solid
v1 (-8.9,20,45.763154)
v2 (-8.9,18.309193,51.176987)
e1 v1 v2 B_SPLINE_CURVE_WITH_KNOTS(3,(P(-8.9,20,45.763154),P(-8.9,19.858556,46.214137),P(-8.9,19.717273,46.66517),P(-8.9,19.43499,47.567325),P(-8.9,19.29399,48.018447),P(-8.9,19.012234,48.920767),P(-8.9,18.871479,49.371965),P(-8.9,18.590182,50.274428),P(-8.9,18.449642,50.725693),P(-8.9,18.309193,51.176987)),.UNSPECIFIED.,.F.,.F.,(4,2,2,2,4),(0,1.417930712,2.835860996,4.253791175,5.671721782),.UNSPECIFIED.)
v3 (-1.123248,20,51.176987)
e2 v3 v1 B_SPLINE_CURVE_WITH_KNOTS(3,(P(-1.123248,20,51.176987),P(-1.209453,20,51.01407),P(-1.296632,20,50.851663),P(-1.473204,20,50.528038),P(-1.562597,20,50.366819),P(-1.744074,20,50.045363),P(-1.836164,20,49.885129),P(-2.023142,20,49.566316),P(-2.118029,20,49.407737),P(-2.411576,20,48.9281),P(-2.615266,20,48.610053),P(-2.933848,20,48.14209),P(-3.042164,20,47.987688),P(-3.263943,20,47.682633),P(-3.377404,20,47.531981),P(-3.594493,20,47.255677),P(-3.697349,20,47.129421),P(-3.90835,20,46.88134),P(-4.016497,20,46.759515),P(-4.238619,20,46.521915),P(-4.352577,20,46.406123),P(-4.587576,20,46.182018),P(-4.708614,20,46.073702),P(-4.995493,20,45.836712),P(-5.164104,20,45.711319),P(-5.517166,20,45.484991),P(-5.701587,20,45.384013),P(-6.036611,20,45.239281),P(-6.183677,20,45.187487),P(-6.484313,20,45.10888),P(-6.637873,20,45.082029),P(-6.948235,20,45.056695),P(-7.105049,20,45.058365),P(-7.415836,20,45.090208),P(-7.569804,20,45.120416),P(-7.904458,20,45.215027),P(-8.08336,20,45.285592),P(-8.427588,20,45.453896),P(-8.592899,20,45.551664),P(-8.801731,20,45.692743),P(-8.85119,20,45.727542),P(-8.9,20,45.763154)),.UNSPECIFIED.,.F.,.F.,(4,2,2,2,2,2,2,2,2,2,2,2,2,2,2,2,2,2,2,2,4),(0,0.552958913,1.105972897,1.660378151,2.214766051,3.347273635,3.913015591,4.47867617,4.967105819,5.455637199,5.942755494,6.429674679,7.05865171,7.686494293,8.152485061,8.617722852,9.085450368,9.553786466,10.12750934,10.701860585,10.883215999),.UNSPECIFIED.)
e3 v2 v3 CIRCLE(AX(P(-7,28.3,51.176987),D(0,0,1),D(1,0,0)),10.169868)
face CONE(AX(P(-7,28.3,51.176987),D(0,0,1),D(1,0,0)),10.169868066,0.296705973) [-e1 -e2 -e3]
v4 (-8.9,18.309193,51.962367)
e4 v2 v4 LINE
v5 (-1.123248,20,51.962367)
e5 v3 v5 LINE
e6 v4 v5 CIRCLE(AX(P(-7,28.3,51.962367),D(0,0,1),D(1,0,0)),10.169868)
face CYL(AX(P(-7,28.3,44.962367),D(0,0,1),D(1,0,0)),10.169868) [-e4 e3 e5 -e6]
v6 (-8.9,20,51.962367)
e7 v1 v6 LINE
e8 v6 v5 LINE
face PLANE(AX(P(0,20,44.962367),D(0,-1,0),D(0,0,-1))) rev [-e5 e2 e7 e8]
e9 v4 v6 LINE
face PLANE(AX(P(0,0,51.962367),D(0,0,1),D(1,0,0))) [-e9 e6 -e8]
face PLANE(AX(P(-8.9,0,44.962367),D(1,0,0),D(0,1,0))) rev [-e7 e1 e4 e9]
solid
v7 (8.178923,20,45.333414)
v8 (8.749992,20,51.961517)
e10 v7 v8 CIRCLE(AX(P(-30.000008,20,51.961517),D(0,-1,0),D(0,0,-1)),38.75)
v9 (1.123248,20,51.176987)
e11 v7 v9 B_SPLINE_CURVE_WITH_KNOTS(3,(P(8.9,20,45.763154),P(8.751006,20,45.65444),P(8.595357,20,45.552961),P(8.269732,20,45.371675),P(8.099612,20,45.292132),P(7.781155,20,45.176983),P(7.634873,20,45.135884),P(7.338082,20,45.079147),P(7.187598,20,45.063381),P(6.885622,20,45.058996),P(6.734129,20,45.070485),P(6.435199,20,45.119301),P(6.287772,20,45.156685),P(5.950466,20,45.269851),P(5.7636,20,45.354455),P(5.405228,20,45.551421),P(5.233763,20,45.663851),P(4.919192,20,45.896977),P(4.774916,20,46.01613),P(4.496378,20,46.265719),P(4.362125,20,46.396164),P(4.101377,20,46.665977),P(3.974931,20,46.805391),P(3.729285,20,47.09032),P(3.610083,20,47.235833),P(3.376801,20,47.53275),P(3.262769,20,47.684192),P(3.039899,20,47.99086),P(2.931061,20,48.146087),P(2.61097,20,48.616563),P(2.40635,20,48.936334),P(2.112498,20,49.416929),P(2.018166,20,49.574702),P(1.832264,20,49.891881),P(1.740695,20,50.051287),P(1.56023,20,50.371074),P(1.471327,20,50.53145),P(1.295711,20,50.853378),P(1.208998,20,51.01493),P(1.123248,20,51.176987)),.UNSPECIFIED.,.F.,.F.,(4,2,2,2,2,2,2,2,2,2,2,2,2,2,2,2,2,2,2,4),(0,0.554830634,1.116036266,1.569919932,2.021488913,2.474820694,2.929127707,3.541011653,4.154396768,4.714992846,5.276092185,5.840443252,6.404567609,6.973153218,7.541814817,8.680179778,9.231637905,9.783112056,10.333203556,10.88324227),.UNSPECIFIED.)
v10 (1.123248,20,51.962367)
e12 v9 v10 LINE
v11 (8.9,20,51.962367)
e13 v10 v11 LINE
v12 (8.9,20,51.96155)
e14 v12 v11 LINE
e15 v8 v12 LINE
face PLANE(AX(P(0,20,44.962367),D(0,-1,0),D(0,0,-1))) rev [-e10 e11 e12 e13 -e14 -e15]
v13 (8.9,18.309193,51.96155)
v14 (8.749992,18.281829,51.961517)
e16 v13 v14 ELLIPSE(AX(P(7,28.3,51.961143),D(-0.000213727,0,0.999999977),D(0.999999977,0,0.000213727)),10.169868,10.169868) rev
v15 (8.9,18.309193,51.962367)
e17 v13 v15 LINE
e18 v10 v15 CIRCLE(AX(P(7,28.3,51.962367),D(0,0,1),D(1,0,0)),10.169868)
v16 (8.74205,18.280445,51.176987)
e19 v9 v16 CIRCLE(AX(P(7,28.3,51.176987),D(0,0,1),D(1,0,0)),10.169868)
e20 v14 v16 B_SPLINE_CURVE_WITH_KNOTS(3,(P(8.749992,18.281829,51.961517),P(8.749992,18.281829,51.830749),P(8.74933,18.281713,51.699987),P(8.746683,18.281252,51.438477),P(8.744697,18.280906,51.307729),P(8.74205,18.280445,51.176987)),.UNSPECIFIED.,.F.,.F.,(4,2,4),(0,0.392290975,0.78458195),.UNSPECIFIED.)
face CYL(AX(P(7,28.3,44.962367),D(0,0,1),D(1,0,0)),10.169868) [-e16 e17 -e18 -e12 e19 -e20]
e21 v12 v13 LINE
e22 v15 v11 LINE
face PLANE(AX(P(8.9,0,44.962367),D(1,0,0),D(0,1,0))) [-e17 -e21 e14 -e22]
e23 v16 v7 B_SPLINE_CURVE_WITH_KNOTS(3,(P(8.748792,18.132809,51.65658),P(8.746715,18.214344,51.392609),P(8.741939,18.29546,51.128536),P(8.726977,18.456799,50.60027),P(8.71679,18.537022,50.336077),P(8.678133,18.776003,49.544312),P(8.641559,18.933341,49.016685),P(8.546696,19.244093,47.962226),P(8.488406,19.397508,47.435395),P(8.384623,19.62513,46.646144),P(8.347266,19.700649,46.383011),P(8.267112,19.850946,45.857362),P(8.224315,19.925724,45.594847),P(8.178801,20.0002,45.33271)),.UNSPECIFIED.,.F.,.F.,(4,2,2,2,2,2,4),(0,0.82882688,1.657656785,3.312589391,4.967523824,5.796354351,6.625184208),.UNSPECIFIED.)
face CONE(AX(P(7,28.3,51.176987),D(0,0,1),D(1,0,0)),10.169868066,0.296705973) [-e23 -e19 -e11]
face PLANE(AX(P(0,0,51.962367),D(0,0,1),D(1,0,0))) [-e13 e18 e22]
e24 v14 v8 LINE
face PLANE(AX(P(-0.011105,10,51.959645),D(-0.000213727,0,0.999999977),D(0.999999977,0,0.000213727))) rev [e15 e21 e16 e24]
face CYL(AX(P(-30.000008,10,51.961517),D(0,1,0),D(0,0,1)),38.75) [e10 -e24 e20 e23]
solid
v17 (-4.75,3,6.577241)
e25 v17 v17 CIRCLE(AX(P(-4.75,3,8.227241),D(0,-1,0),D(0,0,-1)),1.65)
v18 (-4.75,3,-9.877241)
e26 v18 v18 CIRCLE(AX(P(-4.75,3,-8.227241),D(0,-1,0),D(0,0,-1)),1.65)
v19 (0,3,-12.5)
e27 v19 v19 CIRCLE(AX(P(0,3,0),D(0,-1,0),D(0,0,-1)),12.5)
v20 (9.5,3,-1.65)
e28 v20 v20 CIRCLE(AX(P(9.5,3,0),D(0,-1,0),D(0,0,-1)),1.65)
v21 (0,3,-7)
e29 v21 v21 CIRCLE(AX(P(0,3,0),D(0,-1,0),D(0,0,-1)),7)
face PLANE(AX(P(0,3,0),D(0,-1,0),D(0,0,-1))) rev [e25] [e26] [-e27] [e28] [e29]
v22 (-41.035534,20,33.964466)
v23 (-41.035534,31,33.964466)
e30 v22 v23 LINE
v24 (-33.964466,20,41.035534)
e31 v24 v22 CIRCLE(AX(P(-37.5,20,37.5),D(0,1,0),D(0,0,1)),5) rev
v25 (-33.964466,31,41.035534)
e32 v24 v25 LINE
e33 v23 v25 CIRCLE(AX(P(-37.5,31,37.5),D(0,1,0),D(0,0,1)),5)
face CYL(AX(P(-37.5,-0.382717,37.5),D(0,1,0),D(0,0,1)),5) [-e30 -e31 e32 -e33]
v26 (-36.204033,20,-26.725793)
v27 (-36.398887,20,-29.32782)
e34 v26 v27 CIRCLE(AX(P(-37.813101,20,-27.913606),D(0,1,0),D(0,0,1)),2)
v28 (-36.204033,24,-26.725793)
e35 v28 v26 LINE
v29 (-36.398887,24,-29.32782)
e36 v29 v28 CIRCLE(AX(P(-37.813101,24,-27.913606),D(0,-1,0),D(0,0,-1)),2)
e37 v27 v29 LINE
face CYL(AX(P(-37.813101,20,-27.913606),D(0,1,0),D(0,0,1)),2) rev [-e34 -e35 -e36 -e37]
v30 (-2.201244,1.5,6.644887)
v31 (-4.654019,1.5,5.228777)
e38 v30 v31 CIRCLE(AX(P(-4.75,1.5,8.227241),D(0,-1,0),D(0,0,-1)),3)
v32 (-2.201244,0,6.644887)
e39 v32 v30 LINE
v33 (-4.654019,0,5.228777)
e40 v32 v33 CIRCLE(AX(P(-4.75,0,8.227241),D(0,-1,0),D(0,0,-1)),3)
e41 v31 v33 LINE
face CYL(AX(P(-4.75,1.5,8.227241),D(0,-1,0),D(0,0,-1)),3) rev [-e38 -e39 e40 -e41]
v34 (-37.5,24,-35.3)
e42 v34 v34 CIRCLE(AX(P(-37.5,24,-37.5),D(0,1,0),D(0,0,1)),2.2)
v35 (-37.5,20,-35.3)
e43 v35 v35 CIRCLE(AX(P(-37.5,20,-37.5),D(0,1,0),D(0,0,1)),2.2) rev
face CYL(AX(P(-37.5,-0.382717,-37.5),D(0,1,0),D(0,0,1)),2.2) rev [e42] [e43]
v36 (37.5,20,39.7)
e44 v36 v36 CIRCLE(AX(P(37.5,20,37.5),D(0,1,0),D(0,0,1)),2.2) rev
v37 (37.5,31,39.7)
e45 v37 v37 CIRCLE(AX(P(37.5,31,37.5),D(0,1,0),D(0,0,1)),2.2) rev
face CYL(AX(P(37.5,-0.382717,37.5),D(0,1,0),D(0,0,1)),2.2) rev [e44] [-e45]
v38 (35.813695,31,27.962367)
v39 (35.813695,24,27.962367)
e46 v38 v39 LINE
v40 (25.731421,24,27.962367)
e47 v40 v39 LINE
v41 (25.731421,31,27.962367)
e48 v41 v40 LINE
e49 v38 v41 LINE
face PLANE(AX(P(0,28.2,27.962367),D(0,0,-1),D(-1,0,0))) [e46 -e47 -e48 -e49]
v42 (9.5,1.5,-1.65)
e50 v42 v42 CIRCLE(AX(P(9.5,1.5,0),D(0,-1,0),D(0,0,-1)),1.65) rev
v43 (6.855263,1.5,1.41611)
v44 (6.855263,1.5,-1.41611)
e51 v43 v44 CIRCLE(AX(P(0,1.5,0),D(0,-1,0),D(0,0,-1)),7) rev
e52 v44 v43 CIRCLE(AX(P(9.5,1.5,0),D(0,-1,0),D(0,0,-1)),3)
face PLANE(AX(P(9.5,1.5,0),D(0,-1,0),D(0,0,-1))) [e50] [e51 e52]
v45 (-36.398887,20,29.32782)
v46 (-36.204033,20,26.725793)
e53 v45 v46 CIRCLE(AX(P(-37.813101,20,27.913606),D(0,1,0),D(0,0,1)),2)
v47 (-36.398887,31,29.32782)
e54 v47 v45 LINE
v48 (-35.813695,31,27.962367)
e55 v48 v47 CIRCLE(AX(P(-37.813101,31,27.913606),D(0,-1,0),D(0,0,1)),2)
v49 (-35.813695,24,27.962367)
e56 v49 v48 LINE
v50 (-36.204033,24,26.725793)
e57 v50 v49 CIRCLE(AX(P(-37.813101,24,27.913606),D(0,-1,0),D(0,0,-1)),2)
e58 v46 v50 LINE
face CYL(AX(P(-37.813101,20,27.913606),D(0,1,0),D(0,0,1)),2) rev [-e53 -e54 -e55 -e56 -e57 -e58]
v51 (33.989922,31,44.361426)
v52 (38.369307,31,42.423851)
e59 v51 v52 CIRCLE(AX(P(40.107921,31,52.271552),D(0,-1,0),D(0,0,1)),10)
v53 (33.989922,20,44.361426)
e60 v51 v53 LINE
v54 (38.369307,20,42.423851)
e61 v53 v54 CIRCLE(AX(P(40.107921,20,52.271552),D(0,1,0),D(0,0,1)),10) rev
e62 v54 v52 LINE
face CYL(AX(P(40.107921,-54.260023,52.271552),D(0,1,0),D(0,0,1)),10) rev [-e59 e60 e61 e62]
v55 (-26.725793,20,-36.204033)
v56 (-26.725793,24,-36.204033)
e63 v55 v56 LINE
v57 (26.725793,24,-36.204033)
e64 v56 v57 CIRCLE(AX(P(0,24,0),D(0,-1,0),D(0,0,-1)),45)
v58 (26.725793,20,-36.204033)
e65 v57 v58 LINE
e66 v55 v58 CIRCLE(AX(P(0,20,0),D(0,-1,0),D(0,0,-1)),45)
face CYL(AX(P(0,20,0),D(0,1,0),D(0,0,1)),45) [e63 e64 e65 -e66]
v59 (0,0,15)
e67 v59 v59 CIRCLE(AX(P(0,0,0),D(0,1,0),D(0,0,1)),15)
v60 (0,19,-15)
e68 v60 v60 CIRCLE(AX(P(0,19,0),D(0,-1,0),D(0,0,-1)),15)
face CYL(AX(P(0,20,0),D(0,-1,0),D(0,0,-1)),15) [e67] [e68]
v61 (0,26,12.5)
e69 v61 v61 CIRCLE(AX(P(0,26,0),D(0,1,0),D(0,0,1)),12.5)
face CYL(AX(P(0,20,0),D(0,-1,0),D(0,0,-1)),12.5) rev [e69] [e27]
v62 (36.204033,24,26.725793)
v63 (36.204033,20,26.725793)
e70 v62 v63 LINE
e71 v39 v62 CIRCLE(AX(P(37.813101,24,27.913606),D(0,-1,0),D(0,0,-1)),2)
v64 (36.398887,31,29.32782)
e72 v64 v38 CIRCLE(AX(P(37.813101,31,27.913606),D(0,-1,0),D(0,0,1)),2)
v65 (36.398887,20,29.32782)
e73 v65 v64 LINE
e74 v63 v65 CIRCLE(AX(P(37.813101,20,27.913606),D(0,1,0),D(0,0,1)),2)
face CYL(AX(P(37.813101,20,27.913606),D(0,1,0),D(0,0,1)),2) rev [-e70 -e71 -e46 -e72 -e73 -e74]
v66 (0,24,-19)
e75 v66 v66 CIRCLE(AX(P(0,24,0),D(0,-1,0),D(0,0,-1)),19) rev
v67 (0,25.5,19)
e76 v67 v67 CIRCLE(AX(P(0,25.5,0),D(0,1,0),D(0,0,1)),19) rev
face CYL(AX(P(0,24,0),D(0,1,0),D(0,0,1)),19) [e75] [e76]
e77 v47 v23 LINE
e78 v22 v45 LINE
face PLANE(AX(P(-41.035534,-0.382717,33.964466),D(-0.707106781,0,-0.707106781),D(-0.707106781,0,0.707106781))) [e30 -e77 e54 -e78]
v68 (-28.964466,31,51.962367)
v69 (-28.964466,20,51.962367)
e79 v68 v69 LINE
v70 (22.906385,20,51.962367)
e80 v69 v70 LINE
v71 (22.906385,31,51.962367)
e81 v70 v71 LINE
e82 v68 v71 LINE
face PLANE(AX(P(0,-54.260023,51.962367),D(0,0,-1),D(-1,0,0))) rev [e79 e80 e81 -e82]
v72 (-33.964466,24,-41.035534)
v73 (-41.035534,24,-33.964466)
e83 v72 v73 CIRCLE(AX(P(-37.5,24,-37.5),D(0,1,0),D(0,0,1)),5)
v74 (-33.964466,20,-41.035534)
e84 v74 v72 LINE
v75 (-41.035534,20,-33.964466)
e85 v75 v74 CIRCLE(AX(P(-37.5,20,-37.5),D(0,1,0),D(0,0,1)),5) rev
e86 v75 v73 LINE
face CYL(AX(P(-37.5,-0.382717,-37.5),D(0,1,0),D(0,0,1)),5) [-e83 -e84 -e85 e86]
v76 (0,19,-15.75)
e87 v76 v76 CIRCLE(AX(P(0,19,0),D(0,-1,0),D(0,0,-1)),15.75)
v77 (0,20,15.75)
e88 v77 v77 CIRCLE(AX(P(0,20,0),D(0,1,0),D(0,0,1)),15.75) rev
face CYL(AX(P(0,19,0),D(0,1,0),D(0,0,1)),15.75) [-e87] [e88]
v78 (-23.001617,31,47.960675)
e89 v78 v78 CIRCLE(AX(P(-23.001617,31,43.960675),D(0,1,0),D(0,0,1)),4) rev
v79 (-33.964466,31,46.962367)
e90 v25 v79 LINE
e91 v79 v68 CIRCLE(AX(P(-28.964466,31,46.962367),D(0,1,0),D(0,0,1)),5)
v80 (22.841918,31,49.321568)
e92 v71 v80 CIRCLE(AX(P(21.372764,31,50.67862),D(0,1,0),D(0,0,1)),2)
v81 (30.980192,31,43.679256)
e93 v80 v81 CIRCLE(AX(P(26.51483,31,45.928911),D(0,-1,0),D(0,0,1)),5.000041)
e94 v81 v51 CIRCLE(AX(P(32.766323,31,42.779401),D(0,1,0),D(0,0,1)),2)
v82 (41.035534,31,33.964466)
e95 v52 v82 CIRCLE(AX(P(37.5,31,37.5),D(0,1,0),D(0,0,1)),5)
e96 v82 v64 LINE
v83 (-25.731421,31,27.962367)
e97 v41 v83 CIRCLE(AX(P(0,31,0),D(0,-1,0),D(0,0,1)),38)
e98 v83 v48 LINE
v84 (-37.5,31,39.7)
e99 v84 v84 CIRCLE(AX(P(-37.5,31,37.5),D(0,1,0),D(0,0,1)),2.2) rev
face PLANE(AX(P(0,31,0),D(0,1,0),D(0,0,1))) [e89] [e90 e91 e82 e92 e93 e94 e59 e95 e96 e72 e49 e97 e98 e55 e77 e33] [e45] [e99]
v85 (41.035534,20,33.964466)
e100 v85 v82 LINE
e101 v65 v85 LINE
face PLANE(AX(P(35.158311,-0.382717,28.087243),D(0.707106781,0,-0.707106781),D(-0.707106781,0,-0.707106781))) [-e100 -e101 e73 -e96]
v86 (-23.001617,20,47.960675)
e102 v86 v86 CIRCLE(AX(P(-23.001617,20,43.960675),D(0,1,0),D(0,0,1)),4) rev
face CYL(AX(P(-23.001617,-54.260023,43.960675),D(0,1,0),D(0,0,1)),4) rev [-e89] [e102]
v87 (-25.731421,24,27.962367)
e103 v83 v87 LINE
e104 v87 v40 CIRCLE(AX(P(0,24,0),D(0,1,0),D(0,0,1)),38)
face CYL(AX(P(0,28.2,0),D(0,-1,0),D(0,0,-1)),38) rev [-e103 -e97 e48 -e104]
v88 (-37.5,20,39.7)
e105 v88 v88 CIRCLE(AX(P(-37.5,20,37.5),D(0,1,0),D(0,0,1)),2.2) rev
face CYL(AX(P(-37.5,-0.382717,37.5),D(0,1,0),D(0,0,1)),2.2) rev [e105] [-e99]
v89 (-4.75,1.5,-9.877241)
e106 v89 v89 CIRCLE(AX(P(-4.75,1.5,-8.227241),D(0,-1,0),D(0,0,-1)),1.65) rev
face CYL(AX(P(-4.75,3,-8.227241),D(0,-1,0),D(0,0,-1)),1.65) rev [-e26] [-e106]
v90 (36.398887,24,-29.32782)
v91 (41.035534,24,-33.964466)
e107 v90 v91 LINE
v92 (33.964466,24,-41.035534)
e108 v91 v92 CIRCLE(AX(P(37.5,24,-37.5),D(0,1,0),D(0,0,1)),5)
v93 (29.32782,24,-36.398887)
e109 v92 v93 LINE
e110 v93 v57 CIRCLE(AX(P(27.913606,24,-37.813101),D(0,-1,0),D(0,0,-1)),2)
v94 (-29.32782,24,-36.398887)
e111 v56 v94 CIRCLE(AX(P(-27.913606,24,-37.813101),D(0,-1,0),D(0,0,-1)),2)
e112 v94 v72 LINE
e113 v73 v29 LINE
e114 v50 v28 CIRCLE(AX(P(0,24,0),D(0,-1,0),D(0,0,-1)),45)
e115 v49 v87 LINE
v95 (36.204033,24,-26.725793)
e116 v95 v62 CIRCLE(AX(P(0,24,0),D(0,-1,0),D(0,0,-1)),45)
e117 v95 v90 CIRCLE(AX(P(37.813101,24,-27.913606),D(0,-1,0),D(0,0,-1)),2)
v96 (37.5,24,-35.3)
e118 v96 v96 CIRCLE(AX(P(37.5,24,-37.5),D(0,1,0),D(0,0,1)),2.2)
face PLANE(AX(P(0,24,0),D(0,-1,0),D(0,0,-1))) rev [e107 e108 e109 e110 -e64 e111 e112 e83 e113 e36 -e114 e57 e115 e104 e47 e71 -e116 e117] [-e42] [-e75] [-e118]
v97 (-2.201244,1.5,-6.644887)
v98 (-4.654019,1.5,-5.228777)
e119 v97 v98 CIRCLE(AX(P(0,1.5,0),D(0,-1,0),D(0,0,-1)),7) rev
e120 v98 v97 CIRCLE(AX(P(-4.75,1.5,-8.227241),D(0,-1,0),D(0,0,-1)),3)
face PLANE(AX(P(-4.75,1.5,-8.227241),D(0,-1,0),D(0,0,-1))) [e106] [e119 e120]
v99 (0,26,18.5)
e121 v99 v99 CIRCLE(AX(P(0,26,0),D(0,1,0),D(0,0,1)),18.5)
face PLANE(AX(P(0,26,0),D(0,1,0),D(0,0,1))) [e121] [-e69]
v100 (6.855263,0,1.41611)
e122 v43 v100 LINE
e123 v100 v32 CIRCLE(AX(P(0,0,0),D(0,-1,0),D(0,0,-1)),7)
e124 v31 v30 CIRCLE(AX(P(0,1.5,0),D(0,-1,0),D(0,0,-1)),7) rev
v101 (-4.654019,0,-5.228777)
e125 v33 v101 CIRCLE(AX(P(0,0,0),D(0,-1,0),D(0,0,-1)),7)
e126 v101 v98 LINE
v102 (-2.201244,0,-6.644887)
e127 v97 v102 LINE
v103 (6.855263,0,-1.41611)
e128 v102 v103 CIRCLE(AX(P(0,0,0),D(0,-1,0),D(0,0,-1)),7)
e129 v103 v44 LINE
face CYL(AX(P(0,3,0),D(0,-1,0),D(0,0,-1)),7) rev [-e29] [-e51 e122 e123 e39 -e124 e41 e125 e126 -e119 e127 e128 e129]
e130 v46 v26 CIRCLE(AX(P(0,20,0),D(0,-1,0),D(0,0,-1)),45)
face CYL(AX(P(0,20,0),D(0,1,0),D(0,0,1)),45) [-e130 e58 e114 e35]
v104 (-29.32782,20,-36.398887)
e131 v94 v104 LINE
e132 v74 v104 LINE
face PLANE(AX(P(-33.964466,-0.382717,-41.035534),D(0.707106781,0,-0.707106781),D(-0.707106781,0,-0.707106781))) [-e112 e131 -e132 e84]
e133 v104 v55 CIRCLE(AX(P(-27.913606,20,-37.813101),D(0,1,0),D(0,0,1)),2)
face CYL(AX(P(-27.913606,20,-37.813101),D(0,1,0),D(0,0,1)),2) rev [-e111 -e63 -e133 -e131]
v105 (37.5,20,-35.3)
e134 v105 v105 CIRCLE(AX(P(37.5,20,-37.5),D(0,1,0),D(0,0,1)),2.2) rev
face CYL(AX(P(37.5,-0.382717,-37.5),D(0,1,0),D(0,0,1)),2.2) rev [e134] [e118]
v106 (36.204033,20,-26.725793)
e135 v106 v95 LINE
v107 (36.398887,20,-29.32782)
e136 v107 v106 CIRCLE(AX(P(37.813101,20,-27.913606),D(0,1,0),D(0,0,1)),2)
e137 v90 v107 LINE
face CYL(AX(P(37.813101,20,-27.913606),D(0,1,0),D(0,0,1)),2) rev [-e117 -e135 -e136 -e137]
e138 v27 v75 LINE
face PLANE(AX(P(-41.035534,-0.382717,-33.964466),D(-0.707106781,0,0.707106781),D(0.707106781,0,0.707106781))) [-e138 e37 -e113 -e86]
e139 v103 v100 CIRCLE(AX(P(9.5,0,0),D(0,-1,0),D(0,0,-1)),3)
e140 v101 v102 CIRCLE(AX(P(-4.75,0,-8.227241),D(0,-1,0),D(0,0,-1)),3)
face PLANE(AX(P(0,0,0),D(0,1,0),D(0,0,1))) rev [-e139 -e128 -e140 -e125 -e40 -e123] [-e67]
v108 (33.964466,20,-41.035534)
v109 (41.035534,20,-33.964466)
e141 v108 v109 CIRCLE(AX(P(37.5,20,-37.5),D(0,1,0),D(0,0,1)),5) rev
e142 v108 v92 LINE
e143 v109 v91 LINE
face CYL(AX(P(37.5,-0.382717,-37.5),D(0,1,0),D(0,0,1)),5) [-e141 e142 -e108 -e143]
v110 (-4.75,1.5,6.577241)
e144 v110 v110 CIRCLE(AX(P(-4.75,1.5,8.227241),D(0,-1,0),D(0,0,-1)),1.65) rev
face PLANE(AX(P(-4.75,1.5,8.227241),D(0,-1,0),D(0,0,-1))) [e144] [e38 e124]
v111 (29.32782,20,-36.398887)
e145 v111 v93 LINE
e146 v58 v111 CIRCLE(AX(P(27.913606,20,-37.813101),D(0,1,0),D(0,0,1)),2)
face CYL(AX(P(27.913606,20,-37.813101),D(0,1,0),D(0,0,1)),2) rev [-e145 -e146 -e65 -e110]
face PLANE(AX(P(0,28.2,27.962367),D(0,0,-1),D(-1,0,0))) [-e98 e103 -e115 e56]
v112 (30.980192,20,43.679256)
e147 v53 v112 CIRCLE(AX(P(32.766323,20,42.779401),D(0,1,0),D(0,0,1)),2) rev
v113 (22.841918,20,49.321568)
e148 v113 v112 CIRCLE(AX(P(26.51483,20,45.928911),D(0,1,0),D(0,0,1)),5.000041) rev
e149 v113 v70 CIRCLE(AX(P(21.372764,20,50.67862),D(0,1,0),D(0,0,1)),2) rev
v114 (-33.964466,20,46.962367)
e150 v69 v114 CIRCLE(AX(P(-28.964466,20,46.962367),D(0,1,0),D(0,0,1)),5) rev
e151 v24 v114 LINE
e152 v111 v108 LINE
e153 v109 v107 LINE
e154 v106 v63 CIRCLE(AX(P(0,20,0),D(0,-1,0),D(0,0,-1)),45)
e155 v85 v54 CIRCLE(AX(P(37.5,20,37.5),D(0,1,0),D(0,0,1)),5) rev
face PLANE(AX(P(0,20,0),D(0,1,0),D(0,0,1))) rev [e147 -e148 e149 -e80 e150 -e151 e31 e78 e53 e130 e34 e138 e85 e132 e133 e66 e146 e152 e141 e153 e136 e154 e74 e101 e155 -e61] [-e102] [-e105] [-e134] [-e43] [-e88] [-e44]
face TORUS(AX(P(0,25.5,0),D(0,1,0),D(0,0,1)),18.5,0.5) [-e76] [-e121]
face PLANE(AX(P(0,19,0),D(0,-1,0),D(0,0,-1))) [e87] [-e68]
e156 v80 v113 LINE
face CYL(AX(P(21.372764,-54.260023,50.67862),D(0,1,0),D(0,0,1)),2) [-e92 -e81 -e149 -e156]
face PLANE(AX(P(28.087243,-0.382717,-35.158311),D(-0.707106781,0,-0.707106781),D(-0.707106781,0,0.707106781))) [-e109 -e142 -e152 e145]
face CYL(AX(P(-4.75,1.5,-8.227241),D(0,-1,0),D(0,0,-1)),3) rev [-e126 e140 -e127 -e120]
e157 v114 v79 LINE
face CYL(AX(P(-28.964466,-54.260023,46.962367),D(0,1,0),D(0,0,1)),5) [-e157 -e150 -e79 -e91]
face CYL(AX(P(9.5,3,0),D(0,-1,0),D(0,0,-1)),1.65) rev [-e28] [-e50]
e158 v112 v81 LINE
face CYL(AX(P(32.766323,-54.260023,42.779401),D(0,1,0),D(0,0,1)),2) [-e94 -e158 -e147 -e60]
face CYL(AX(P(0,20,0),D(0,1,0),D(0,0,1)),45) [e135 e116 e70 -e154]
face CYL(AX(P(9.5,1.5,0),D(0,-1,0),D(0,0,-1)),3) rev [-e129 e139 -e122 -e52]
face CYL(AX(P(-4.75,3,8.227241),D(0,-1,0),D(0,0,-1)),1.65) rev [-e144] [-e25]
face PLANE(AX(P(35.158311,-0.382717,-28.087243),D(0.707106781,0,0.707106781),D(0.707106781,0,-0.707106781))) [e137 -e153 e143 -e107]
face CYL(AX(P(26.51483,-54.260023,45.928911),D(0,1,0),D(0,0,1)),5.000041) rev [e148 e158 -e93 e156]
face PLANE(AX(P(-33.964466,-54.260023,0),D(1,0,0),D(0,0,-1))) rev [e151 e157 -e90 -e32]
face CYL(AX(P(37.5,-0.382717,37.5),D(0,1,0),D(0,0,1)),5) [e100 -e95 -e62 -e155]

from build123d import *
from build123d.topology import SkipClean

# Parameters (mm, degrees)
SKETCH_1_R          = 15
SKETCH_1_R_2        = 12.5
EXTRUDE_1_DEPTH     = 20
SKETCH_2_R          = 17
SKETCH_2_R_2        = 12.5
EXTRUDE_2_DEPTH     = 6
SKETCH_3_R          = 12.5
SKETCH_3_R_2        = 7
SKETCH_3_R_3        = 1.65
EXTRUDE_3_DEPTH     = 3
EXTRUDE_START       = -2
SKETCH_5_R          = 19
SKETCH_5_R_2        = 17
EXTRUDE_5_DEPTH     = 2
SKETCH_6_W          = 26
SKETCH_6_H          = 26
SKETCH_6_R          = 12.5
EXTRUDE_6_DEPTH     = 2
EXTRUDE_START_2     = 4
SKETCH_7_R          = 45
SKETCH_7_R_2        = 17
EXTRUDE_7_DEPTH     = 4
EXTRUDE_START_3     = -4
SKETCH_8_R          = 2.2
EXTRUDE_8_DEPTH     = 4
SKETCH_9_R          = 4
EXTRUDE_9_DEPTH     = 4
FILLET_1_R          = 2
SKETCH_10_R         = 19
CUT_EXTRUDE_1_DEPTH = 74.492092218
FILLET_2_R          = 0.5
FILLET_3_R          = 5
SKETCH_11_R         = 3
CUT_EXTRUDE_2_DEPTH = 1.5
EXTRUDE_START_4     = 1
SKETCH_12_R         = 15.75
SKETCH_12_R_2       = 15
EXTRUDE_10_DEPTH    = 1
SKETCH_13_R         = 4
SKETCH_13_R_2       = 2.2
EXTRUDE_11_DEPTH    = 4.2
EXTRUDE_12_DEPTH    = 7
EXTRUDE_12_2_DEPTH  = 7
CHAMFER_1_SIZE      = 6.214619975
CHAMFER_1_SIZE_2    = 1.9
CHAMFER_2_SIZE      = 6.214619975
CHAMFER_2_SIZE_2    = 1.9
CUT_EXTRUDE_4_DEPTH = 10
FILLET_4_R          = 2
SKETCH_16_R         = 2.2
SKETCH_16_R_2       = 4
EXTRUDE_13_DEPTH    = 3
CUT_EXTRUDE_START   = -0.2
CUT_EXTRUDE_5_DEPTH = 0.2


with BuildPart() as part:
    # 草图1 → 凸台-拉伸1 (new body)
    with BuildSketch(Plane(origin=(0, 0, 0), x_dir=(1, 0, 0), z_dir=(0, 1, 0))):
        with Locations(Location((0, 0, 0), (0, 0, 270))):
            Circle(SKETCH_1_R)
        with Locations(Location((0, 0, 0), (0, 0, 270))):
            Circle(SKETCH_1_R_2, mode=Mode.SUBTRACT)
    extrude(amount=EXTRUDE_1_DEPTH)

    # 草图2 → 凸台-拉伸2 (add)
    with BuildSketch(Plane(origin=(0, 20, 0), x_dir=(1, 0, 0), z_dir=(0, 1, 0))):
        with Locations(Location((0, 0, 0), (0, 0, 270))):
            Circle(SKETCH_2_R)
        with Locations(Location((0, 0, 0), (0, 0, 270))):
            Circle(SKETCH_2_R_2, mode=Mode.SUBTRACT)
    extrude(amount=EXTRUDE_2_DEPTH)

    # 草图3 → 凸台-拉伸3 (add)
    with BuildSketch(Plane.XZ):
        with Locations(Location((0, 0, 0), (0, 0, 270))):
            Circle(SKETCH_3_R)
        with Locations(Location((0, 0, 0), (0, 0, 270))):
            Circle(SKETCH_3_R_2, mode=Mode.SUBTRACT)
        with Locations(Location((9.5, 0, 0), (0, 0, 270))):
            Circle(SKETCH_3_R_3, mode=Mode.SUBTRACT)
        with Locations(Location((-4.75, -8.227241336, 0), (0, 0, 270))):
            Circle(SKETCH_3_R_3, mode=Mode.SUBTRACT)
        with Locations(Location((-4.75, 8.227241336, 0), (0, 0, 270))):
            Circle(SKETCH_3_R_3, mode=Mode.SUBTRACT)
    extrude(amount=-EXTRUDE_3_DEPTH)

    # 草图5 → 凸台-拉伸5 (add)
    with BuildSketch(Plane(origin=(0, 26, 0), x_dir=(1, 0, 0), z_dir=(0, 1, 0)).offset(EXTRUDE_START)):
        with Locations(Location((0, 0, 0), (0, 0, 270))):
            Circle(SKETCH_5_R)
        with Locations(Location((0, 0, 0), (0, 0, 270))):
            Circle(SKETCH_5_R_2, mode=Mode.SUBTRACT)
    extrude(amount=EXTRUDE_5_DEPTH)

    # 草图6 → 凸台-拉伸6 (add)
    with BuildSketch(Plane(origin=(0, 26, 0), x_dir=(1, 0, 0), z_dir=(0, 1, 0))):
        Rectangle(SKETCH_6_W, SKETCH_6_H)
        with Locations(Location((0, 0, 0), (0, 0, 90))):
            Circle(SKETCH_6_R, mode=Mode.SUBTRACT)
    extrude(amount=EXTRUDE_6_DEPTH)

    # 草图7 → 凸台-拉伸7 (add)
    with BuildSketch(Plane.XZ.offset(-24).offset(EXTRUDE_START_2)):
        with Locations(Location((0, 0, 0), (0, 0, 270))):
            Circle(SKETCH_7_R)
        Circle(SKETCH_7_R_2, mode=Mode.SUBTRACT)
    extrude(amount=-EXTRUDE_7_DEPTH)

    # 草图8 → 凸台-拉伸8 (add)
    # profile 1 of 4: a face of its own
    with BuildSketch(Plane(origin=(0, 24, 0), x_dir=(1, 0, 0), z_dir=(0, 1, 0)).offset(EXTRUDE_START_3)):
        with BuildLine():
            Line((-41.035533906, -33.964466094), (-35.158310508, -28.087242696))
            ThreePointArc((-35.158310508, -28.087242696), (-31.819805153, -31.819805153), (-28.087242696, -35.158310508))
            Line((-28.087242696, -35.158310508), (-33.964466094, -41.035533906))
            ThreePointArc((-33.964466094, -41.035533906), (-41.035533906, -41.035533906), (-41.035533906, -33.964466094))
        make_face()
        with Locations(Location((-37.5, -37.5, 0), (0, 0, 270))):
            Circle(SKETCH_8_R, mode=Mode.SUBTRACT)
    # profile 2 of 4: a face of its own
    with BuildSketch(Plane(origin=(0, 24, 0), x_dir=(1, 0, 0), z_dir=(0, 1, 0)).offset(EXTRUDE_START_3)):
        with BuildLine():
            Line((-41.035533906, 33.964466094), (-35.158310508, 28.087242696))
            ThreePointArc((-35.158310508, 28.087242696), (-31.819805153, 31.819805153), (-28.087242696, 35.158310508))
            Line((-28.087242696, 35.158310508), (-33.964466094, 41.035533906))
            ThreePointArc((-33.964466094, 41.035533906), (-41.035533906, 41.035533906), (-41.035533906, 33.964466094))
        make_face()
        with Locations(Location((-37.5, 37.5, 0), (0, 0, 270))):
            Circle(SKETCH_8_R, mode=Mode.SUBTRACT)
    # profile 3 of 4: a face of its own
    with BuildSketch(Plane(origin=(0, 24, 0), x_dir=(1, 0, 0), z_dir=(0, 1, 0)).offset(EXTRUDE_START_3)):
        with BuildLine():
            Line((28.087242696, 35.158310508), (33.964466094, 41.035533906))
            ThreePointArc((33.964466094, 41.035533906), (41.035533906, 41.035533906), (41.035533906, 33.964466094))
            Line((41.035533906, 33.964466094), (35.158310508, 28.087242696))
            ThreePointArc((35.158310508, 28.087242696), (31.819805153, 31.819805153), (28.087242696, 35.158310508))
        make_face()
        with Locations(Location((37.5, 37.5, 0), (0, 0, 270))):
            Circle(SKETCH_8_R, mode=Mode.SUBTRACT)
    # profile 4 of 4: a face of its own
    with BuildSketch(Plane(origin=(0, 24, 0), x_dir=(1, 0, 0), z_dir=(0, 1, 0)).offset(EXTRUDE_START_3)):
        with BuildLine():
            Line((35.158310508, -28.087242696), (41.035533906, -33.964466094))
            ThreePointArc((41.035533906, -33.964466094), (41.035533906, -41.035533906), (33.964466094, -41.035533906))
            Line((33.964466094, -41.035533906), (28.087242696, -35.158310508))
            ThreePointArc((28.087242696, -35.158310508), (31.819805153, -31.819805153), (35.158310508, -28.087242696))
        make_face()
        with Locations(Location((37.5, -37.5, 0), (0, 0, 270))):
            Circle(SKETCH_8_R, mode=Mode.SUBTRACT)
    extrude(amount=EXTRUDE_8_DEPTH)

    # 草图9 → 凸台-拉伸9 (add)
    with BuildSketch(Plane(origin=(0, 24, 0), x_dir=(1, 0, 0), z_dir=(0, 1, 0)).offset(EXTRUDE_START_3)):
        with BuildLine():
            Line((33.964466094, -41.035533906), (28.087242696, -35.158310508))
            ThreePointArc((28.087242696, -35.158310508), (0, -45), (-28.087242696, -35.158310508))
            Line((-28.087242696, -35.158310508), (-33.964466094, -41.035533906))
            Line((-33.964466094, -41.035533906), (-33.964466094, -51.96236733))
            Line((-33.964466094, -51.96236733), (22.906384924, -51.96236733))
            Line((22.906384924, -51.96236733), (27.649740331, -50.798447588))
            ThreePointArc((27.649740331, -50.798447588), (23.364635585, -42.046040599), (31.045885235, -48.043136112))
            ThreePointArc((31.045885235, -48.043136112), (34.020425636, -44.337927578), (38.36930714, -42.423850637))
            ThreePointArc((38.36930714, -42.423850637), (35.996987316, -42.268747516), (33.964466094, -41.035533906))
        make_face()
        with Locations(Location((-23.001616716, -43.96067534, 0), (0, 0, 270))):
            Circle(SKETCH_9_R, mode=Mode.SUBTRACT)
    extrude(amount=EXTRUDE_9_DEPTH)

    # 圆角1
    # the kernel refuses this fillet: 2 mm, written as the material it takes off along each edge
    with BuildSketch(Plane(origin=(31.045885235, 8.214854918, 48.043136112), x_dir=(-0.015052067443698006, 0, -0.9998867112156609), z_dir=(0, 1, 0))) as fillet_1_piece_1:
        with BuildLine():
            CenterArc((5.237242596, -1.799472632), FILLET_1_R, 115.876571243, 100.980737452)
            Line((3.636978972, -2.999121053), (3.6049737, -3.023114021))
            ThreePointArc((3.6049737, -3.023114021), (1.972291731, -1.313047371), (-0.017457357, -0.035989453))
            Line((-0.017457357, -0.035989453), (0.017457357, 0.035989453))
            ThreePointArc((0.017457357, 0.035989453), (2.182187383, -0.461322512), (4.34691741, 0.035989453))
            Line((4.34691741, 0.035989453), (4.364374767, 0))
        make_face()
    extrude(amount=27.570290164, mode=Mode.SUBTRACT)
    with BuildSketch(Plane(origin=(27.649740331, 7.426134815, 50.798447588), x_dir=(-0.9711892764491741, 0, 0.23830944024551268), z_dir=(0, 1, 0))) as fillet_1_piece_2:
        with BuildLine():
            CenterArc((6.067575487, -1.612238295), FILLET_1_R, 126.281523765, 82.66024712)
            Line((4.317351562, -2.580079301), (4.282347084, -2.599436121))
            ThreePointArc((4.282347084, -2.599436121), (2.486180213, -0.742013172), (-0.000465948, -0.039997286))
            Line((-0.000465948, -0.039997286), (0, 0.04))
            ThreePointArc((0, 0.04), (2.442034484, 0.04), (4.860398838, 0.032244766))
            Line((4.860398838, 0.032244766), (4.884068968, 0))
        make_face()
    extrude(amount=29.147730371, mode=Mode.SUBTRACT)

    # 草图10 → 切除-拉伸1 (cut, through all)
    with BuildSketch(Plane(origin=(0, 26, 0), x_dir=(1, 0, 0), z_dir=(0, 1, 0))):
        with Locations(Location((0, 0, 0), (0, 0, 270))):
            Circle(SKETCH_10_R)
    extrude(amount=CUT_EXTRUDE_1_DEPTH, mode=Mode.SUBTRACT)

    # 圆角2
    fillet_2_edges = [part.edges().sort_by_distance(p)[0] for p in [
        (0, 26, -19),
    ]]
    fillet(fillet_2_edges, radius=FILLET_2_R)

    # 圆角3
    fillet_3_edges = [part.edges().sort_by_distance(p)[0] for p in [
        (-33.964466094, 22, 51.96236733),
    ]]
    fillet(fillet_3_edges, radius=FILLET_3_R)

    # 草图11 → 切除-拉伸2 (cut)
    with BuildSketch(Plane.XZ):
        with Locations((-4.75, 8.227241336)):
            Circle(SKETCH_11_R)
        with Locations((9.5, 0)):
            Circle(SKETCH_11_R)
        with Locations((-4.75, -8.227241336)):
            Circle(SKETCH_11_R)
    extrude(amount=-CUT_EXTRUDE_2_DEPTH, mode=Mode.SUBTRACT)

    # 草图12 → 凸台-拉伸10 (add)
    with BuildSketch(Plane.XZ.offset(-20).offset(EXTRUDE_START_4)):
        with Locations(Location((0, 0, 0), (0, 0, 90))):
            Circle(SKETCH_12_R)
        with Locations(Location((0, 0, 0), (0, 0, 270))):
            Circle(SKETCH_12_R_2, mode=Mode.SUBTRACT)
    extrude(amount=-EXTRUDE_10_DEPTH)

    # 草图13 → 凸台-拉伸11 (add)
    # profile 1 of 2: a face of its own
    with BuildSketch(Plane(origin=(0, 24, 0), x_dir=(1, 0, 0), z_dir=(0, 1, 0))):
        with BuildLine():
            Line((-25.73142074, -27.96236733), (-35.257708566, -27.96236733))
            ThreePointArc((-35.257708566, -27.96236733), (-35.2080649, -28.024849081), (-35.158310508, -28.087242696))
            ThreePointArc((-35.158310508, -28.087242696), (0, -45), (35.158310508, -28.087242696))
            ThreePointArc((35.158310508, -28.087242696), (35.2080649, -28.024849081), (35.257708566, -27.96236733))
            Line((35.257708566, -27.96236733), (25.73142074, -27.96236733))
            ThreePointArc((25.73142074, -27.96236733), (0, -38), (-25.73142074, -27.96236733))
        make_face()
    # profile 2 of 2: a face of its own
    with BuildSketch(Plane(origin=(0, 24, 0), x_dir=(1, 0, 0), z_dir=(0, 1, 0))):
        with BuildLine():
            ThreePointArc((35.158310508, -28.087242696), (0, -45), (-35.158310508, -28.087242696))
            Line((-35.158310508, -28.087242696), (-41.035533906, -33.964466094))
            ThreePointArc((-41.035533906, -33.964466094), (-41.035533906, -41.035533906), (-33.964466094, -41.035533906))
            Line((-33.964466094, -41.035533906), (-33.964466094, -46.96236733))
            ThreePointArc((-33.964466094, -46.96236733), (-32.5, -50.497901236), (-28.964466094, -51.96236733))
            Line((-28.964466094, -51.96236733), (22.906384924, -51.96236733))
            ThreePointArc((22.906384924, -51.96236733), (23.372168796, -50.629809961), (22.841917537, -49.321567873))
            ThreePointArc((22.841917537, -49.321567873), (23.665985567, -41.819836541), (30.980192372, -43.67925578))
            ThreePointArc((30.980192372, -43.67925578), (32.324226236, -44.729926812), (33.989922469, -44.361426197))
            ThreePointArc((33.989922469, -44.361426197), (36.06191813, -43.126615751), (38.36930714, -42.423850637))
            ThreePointArc((38.36930714, -42.423850637), (42.268747516, -39.003012684), (41.035533906, -33.964466094))
            Line((41.035533906, -33.964466094), (35.158310508, -28.087242696))
        make_face()
        with Locations(Location((-23.001616716, -43.96067534, 0), (0, 0, 270))):
            Circle(SKETCH_13_R, mode=Mode.SUBTRACT)
        with Locations(Location((-37.5, -37.5, 0), (0, 0, 270))):
            Circle(SKETCH_13_R_2, mode=Mode.SUBTRACT)
        with Locations(Location((37.5, -37.5, 0), (0, 0, 270))):
            Circle(SKETCH_13_R_2, mode=Mode.SUBTRACT)
    extrude(amount=EXTRUDE_11_DEPTH)

    # 圆角4
    # the kernel refuses this fillet: 2 mm, written as the material it adds along each edge
    with BuildSketch(Plane(origin=(-35.158310508, 24, 28.087242696), x_dir=(-0.6091445543009105, 0, -0.793059210882482), z_dir=(0, 1, 0))) as fillet_4_piece_1_section:
        with BuildLine():
            CenterArc((1.754855317, 1.99963613), FILLET_4_R, 187.472325658, 81.434718893)
            Line((-0.228160265, 1.739541528), (0, 0))
            ThreePointArc((0, 0), (0.858353144, 0.008187079), (1.716706288, 0))
        make_face()
    fillet_4_piece_1 = extrude(amount=4.2, mode=Mode.PRIVATE)
    fillet_4_piece_1 = split(fillet_4_piece_1, bisect_by=Plane(origin=(-35.158310508, 24, 27.96236733), z_dir=(0, 0, 1)), keep=Keep.TOP, mode=Mode.PRIVATE)
    add(fillet_4_piece_1)
    with BuildSketch(Plane(origin=(28.087242696, 20, -35.158310508), x_dir=(0.7071067811865485, 0, -0.7071067811865465), z_dir=(0, 1, 0)), Plane(origin=(-35.158310508, 20, -28.087242696), x_dir=(-0.7071067811865496, 0, -0.7071067811865455), z_dir=(0, 1, 0))) as fillet_4_piece_2:
        with BuildLine():
            CenterArc((1.754440604, 2), FILLET_4_R, 188.565281108, 81.434718892)
            ThreePointArc((-0.223253019, 1.70212766), (-0.103508957, 0.852128537), (0, 0))
            Line((0, 0), (1.754440604, 0))
        make_face()
    extrude(amount=4)
    with BuildSketch(Plane(origin=(35.158310508, 20, -28.087242696), x_dir=(0.6091445542993271, 0, 0.7930592108836982), z_dir=(0, 1, 0)), Plane(origin=(-28.087242696, 20, -35.158310508), x_dir=(0.7930592108837022, 0, -0.6091445542993219), z_dir=(0, 1, 0)), Plane(origin=(-35.158310508, 20, 28.087242696), x_dir=(-0.6091445542993226, 0, -0.7930592108837018), z_dir=(0, 1, 0))) as fillet_4_piece_3:
        with BuildLine():
            CenterArc((1.754855317, 1.99963613), FILLET_4_R, 187.472325658, 81.434718892)
            Line((-0.228160265, 1.739541528), (0, 0))
            ThreePointArc((0, 0), (0.858353144, 0.008187079), (1.716706288, 0))
        make_face()
    extrude(amount=4)
    with BuildSketch(Plane(origin=(35.158310508, 24, 28.087242696), x_dir=(0.6091445574940213, 0, -0.7930592084298707), z_dir=(0, 1, 0))) as fillet_4_piece_4_section:
        with BuildLine():
            CenterArc((1.754855324, -1.99963613), FILLET_4_R, 91.092955673, 81.4347189)
            Line((-0.228160259, -1.739541536), (0, 0))
            ThreePointArc((0, 0), (0.858353144, -0.008187083), (1.716706288, 0))
        make_face()
    fillet_4_piece_4 = extrude(amount=4.2, mode=Mode.PRIVATE)
    fillet_4_piece_4 = split(fillet_4_piece_4, bisect_by=Plane(origin=(35.158310508, 24, 27.96236733), z_dir=(0, 0, 1)), keep=Keep.TOP, mode=Mode.PRIVATE)
    add(fillet_4_piece_4)
    with BuildSketch(Plane(origin=(35.158310508, 20, 28.087242696), x_dir=(0.609144554299323, 0, -0.7930592108837013), z_dir=(0, 1, 0))) as fillet_4_piece_5:
        with BuildLine():
            CenterArc((1.754855317, -1.99963613), FILLET_4_R, 91.09295545, 81.434718892)
            Line((-0.228160265, -1.739541528), (0, 0))
            ThreePointArc((0, 0), (0.858353144, -0.008187079), (1.716706288, 0))
        make_face()
    extrude(amount=4)

    # 草图16 → 凸台-拉伸13 (add)
    with BuildSketch(Plane(origin=(0, 28.2, 0), x_dir=(1, 0, 0), z_dir=(0, 1, 0))):
        with BuildLine():
            Line((-25.73142074, -27.96236733), (-35.813695424, -27.96236733))
            ThreePointArc((-35.813695424, -27.96236733), (-35.974809945, -28.701442447), (-36.398887356, -29.327819544))
            Line((-36.398887356, -29.327819544), (-41.035533906, -33.964466094))
            ThreePointArc((-41.035533906, -33.964466094), (-41.035533906, -41.035533906), (-33.964466094, -41.035533906))
            Line((-33.964466094, -41.035533906), (-33.964466094, -46.96236733))
            ThreePointArc((-33.964466094, -46.96236733), (-32.5, -50.497901236), (-28.964466094, -51.96236733))
            Line((-28.964466094, -51.96236733), (22.906384924, -51.96236733))
            ThreePointArc((22.906384924, -51.96236733), (23.372168796, -50.629809961), (22.841917537, -49.321567873))
            ThreePointArc((22.841917537, -49.321567873), (23.665985567, -41.819836541), (30.980192372, -43.67925578))
            ThreePointArc((30.980192372, -43.67925578), (32.324226236, -44.729926812), (33.989922469, -44.361426197))
            ThreePointArc((33.989922469, -44.361426197), (36.06191813, -43.126615751), (38.36930714, -42.423850637))
            ThreePointArc((38.36930714, -42.423850637), (42.268747516, -39.003012684), (41.035533906, -33.964466094))
            Line((41.035533906, -33.964466094), (36.398887356, -29.327819544))
            ThreePointArc((36.398887356, -29.327819544), (35.974809945, -28.701442447), (35.813695424, -27.96236733))
            Line((35.813695424, -27.96236733), (25.73142074, -27.96236733))
            ThreePointArc((25.73142074, -27.96236733), (0, -38), (-25.73142074, -27.96236733))
        make_face()
        with Locations(Location((-37.5, -37.5, 0), (0, 0, 270))):
            Circle(SKETCH_16_R, mode=Mode.SUBTRACT)
        with Locations(Location((-23.001616716, -43.96067534, 0), (0, 0, 270))):
            Circle(SKETCH_16_R_2, mode=Mode.SUBTRACT)
        with Locations(Location((37.5, -37.5, 0), (0, 0, 270))):
            Circle(SKETCH_16_R, mode=Mode.SUBTRACT)
    extrude(amount=EXTRUDE_13_DEPTH)

    # 草图17 → 切除-拉伸5 (cut)
    with SkipClean():  # the faces are left unmerged after this step: merging them gives an invalid solid
        with BuildSketch(Plane(origin=(0, 31.2, 0), x_dir=(1, 0, 0), z_dir=(0, 1, 0)).offset(CUT_EXTRUDE_START)):
            with BuildLine():
                Line((-25.73142074, -27.96236733), (-35.813695424, -27.96236733))
                ThreePointArc((-35.813695424, -27.96236733), (-35.974809945, -28.701442447), (-36.398887356, -29.327819544))
                Line((-36.398887356, -29.327819544), (-41.035533906, -33.964466094))
                ThreePointArc((-41.035533906, -33.964466094), (-41.035533906, -41.035533906), (-33.964466094, -41.035533906))
                Line((-33.964466094, -41.035533906), (-33.964466094, -46.96236733))
                ThreePointArc((-33.964466094, -46.96236733), (-32.5, -50.497901236), (-28.964466094, -51.96236733))
                Line((-28.964466094, -51.96236733), (22.906384924, -51.96236733))
                ThreePointArc((22.906384924, -51.96236733), (23.372168796, -50.629809961), (22.841917537, -49.321567873))
                ThreePointArc((22.841917537, -49.321567873), (23.665985567, -41.819836541), (30.980192372, -43.67925578))
                ThreePointArc((30.980192372, -43.67925578), (32.324226236, -44.729926812), (33.989922469, -44.361426197))
                ThreePointArc((33.989922469, -44.361426197), (36.06191813, -43.126615751), (38.36930714, -42.423850637))
                ThreePointArc((38.36930714, -42.423850637), (42.268747516, -39.003012684), (41.035533906, -33.964466094))
                Line((41.035533906, -33.964466094), (36.398887356, -29.327819544))
                ThreePointArc((36.398887356, -29.327819544), (35.974809945, -28.701442447), (35.813695424, -27.96236733))
                Line((35.813695424, -27.96236733), (25.73142074, -27.96236733))
                ThreePointArc((25.73142074, -27.96236733), (0, -38), (-25.73142074, -27.96236733))
            make_face()
        extrude(amount=CUT_EXTRUDE_5_DEPTH, mode=Mode.SUBTRACT)


with BuildPart() as body_2:
    # 草图14 → 凸台-拉伸12 (new body)
    with BuildSketch(Plane.XY.offset(51.96236733)):
        with BuildLine():
            Line((-8.9, 20), (-8.9, 18.309193402))
            ThreePointArc((-8.9, 18.309193402), (-4.839364384, 18.362300557), (-1.123247794, 20))
            Line((-1.123247794, 20), (-8.9, 20))
        make_face()
    extrude(amount=-EXTRUDE_12_DEPTH)

    # 倒角2
    # the kernel refuses this chamfer: 6.214619975, 1.9 mm, written as the material it takes off along each edge
    with BuildSketch(Plane(origin=(-7, 28.3, 44.96236733), x_dir=(-0.9793563195214127, 0.20214153312338567, 0), z_dir=(0.20214153312338567, 0.9793563195214127, 0))) as chamfer_2_piece_1:
        Polygon((10.169868066, CHAMFER_2_SIZE), (10.169868066 - CHAMFER_2_SIZE_2, 0), (10.169868066, 0), align=None)
    revolve(axis=Axis((-7, 28.3, 44.96236733), (0, 0, 1)), revolution_arc=227.856914302, mode=Mode.SUBTRACT)


with BuildPart() as body_3:
    # 草图14 → Extrude 12 2 (new body)
    with BuildSketch(Plane.XY.offset(51.96236733)):
        with BuildLine():
            Line((8.9, 18.309193402), (8.9, 20))
            Line((8.9, 20), (1.123247794, 20))
            ThreePointArc((1.123247794, 20), (4.839364384, 18.362300557), (8.9, 18.309193402))
        make_face()
    extrude(amount=-EXTRUDE_12_2_DEPTH)

    # 倒角1
    # the kernel refuses this chamfer: 6.214619975, 1.9 mm, written as the material it takes off along each edge
    with BuildSketch(Plane(origin=(7, 28.3, 44.96236733), x_dir=(-0.8070149800028303, 0.5905309662084042, 0), z_dir=(0.5905309662084042, 0.8070149800028303, 0))) as chamfer_1_piece_1:
        Polygon((10.169868066, CHAMFER_1_SIZE), (10.169868066 - CHAMFER_1_SIZE_2, 0), (10.169868066, 0), align=None)
    revolve(axis=Axis((7, 28.3, 44.96236733), (0, 0, 1)), revolution_arc=227.856914302, mode=Mode.SUBTRACT)

    # 草图15 → 切除-拉伸4 (cut)
    with BuildSketch(Plane.XZ.offset(-20)):
        with BuildLine():
            Line((12.726349477, 51.96236733), (8.749992214, 51.961517474))
            ThreePointArc((8.749992214, 51.961517474), (8.140258783, 45.114432982), (6.330246869, 38.482827009))
            Line((6.330246869, 38.482827009), (12.726349477, 51.96236733))
        make_face()
    extrude(amount=CUT_EXTRUDE_4_DEPTH, mode=Mode.SUBTRACT)


solid = Compound([part.part, body_2.part, body_3.part])
